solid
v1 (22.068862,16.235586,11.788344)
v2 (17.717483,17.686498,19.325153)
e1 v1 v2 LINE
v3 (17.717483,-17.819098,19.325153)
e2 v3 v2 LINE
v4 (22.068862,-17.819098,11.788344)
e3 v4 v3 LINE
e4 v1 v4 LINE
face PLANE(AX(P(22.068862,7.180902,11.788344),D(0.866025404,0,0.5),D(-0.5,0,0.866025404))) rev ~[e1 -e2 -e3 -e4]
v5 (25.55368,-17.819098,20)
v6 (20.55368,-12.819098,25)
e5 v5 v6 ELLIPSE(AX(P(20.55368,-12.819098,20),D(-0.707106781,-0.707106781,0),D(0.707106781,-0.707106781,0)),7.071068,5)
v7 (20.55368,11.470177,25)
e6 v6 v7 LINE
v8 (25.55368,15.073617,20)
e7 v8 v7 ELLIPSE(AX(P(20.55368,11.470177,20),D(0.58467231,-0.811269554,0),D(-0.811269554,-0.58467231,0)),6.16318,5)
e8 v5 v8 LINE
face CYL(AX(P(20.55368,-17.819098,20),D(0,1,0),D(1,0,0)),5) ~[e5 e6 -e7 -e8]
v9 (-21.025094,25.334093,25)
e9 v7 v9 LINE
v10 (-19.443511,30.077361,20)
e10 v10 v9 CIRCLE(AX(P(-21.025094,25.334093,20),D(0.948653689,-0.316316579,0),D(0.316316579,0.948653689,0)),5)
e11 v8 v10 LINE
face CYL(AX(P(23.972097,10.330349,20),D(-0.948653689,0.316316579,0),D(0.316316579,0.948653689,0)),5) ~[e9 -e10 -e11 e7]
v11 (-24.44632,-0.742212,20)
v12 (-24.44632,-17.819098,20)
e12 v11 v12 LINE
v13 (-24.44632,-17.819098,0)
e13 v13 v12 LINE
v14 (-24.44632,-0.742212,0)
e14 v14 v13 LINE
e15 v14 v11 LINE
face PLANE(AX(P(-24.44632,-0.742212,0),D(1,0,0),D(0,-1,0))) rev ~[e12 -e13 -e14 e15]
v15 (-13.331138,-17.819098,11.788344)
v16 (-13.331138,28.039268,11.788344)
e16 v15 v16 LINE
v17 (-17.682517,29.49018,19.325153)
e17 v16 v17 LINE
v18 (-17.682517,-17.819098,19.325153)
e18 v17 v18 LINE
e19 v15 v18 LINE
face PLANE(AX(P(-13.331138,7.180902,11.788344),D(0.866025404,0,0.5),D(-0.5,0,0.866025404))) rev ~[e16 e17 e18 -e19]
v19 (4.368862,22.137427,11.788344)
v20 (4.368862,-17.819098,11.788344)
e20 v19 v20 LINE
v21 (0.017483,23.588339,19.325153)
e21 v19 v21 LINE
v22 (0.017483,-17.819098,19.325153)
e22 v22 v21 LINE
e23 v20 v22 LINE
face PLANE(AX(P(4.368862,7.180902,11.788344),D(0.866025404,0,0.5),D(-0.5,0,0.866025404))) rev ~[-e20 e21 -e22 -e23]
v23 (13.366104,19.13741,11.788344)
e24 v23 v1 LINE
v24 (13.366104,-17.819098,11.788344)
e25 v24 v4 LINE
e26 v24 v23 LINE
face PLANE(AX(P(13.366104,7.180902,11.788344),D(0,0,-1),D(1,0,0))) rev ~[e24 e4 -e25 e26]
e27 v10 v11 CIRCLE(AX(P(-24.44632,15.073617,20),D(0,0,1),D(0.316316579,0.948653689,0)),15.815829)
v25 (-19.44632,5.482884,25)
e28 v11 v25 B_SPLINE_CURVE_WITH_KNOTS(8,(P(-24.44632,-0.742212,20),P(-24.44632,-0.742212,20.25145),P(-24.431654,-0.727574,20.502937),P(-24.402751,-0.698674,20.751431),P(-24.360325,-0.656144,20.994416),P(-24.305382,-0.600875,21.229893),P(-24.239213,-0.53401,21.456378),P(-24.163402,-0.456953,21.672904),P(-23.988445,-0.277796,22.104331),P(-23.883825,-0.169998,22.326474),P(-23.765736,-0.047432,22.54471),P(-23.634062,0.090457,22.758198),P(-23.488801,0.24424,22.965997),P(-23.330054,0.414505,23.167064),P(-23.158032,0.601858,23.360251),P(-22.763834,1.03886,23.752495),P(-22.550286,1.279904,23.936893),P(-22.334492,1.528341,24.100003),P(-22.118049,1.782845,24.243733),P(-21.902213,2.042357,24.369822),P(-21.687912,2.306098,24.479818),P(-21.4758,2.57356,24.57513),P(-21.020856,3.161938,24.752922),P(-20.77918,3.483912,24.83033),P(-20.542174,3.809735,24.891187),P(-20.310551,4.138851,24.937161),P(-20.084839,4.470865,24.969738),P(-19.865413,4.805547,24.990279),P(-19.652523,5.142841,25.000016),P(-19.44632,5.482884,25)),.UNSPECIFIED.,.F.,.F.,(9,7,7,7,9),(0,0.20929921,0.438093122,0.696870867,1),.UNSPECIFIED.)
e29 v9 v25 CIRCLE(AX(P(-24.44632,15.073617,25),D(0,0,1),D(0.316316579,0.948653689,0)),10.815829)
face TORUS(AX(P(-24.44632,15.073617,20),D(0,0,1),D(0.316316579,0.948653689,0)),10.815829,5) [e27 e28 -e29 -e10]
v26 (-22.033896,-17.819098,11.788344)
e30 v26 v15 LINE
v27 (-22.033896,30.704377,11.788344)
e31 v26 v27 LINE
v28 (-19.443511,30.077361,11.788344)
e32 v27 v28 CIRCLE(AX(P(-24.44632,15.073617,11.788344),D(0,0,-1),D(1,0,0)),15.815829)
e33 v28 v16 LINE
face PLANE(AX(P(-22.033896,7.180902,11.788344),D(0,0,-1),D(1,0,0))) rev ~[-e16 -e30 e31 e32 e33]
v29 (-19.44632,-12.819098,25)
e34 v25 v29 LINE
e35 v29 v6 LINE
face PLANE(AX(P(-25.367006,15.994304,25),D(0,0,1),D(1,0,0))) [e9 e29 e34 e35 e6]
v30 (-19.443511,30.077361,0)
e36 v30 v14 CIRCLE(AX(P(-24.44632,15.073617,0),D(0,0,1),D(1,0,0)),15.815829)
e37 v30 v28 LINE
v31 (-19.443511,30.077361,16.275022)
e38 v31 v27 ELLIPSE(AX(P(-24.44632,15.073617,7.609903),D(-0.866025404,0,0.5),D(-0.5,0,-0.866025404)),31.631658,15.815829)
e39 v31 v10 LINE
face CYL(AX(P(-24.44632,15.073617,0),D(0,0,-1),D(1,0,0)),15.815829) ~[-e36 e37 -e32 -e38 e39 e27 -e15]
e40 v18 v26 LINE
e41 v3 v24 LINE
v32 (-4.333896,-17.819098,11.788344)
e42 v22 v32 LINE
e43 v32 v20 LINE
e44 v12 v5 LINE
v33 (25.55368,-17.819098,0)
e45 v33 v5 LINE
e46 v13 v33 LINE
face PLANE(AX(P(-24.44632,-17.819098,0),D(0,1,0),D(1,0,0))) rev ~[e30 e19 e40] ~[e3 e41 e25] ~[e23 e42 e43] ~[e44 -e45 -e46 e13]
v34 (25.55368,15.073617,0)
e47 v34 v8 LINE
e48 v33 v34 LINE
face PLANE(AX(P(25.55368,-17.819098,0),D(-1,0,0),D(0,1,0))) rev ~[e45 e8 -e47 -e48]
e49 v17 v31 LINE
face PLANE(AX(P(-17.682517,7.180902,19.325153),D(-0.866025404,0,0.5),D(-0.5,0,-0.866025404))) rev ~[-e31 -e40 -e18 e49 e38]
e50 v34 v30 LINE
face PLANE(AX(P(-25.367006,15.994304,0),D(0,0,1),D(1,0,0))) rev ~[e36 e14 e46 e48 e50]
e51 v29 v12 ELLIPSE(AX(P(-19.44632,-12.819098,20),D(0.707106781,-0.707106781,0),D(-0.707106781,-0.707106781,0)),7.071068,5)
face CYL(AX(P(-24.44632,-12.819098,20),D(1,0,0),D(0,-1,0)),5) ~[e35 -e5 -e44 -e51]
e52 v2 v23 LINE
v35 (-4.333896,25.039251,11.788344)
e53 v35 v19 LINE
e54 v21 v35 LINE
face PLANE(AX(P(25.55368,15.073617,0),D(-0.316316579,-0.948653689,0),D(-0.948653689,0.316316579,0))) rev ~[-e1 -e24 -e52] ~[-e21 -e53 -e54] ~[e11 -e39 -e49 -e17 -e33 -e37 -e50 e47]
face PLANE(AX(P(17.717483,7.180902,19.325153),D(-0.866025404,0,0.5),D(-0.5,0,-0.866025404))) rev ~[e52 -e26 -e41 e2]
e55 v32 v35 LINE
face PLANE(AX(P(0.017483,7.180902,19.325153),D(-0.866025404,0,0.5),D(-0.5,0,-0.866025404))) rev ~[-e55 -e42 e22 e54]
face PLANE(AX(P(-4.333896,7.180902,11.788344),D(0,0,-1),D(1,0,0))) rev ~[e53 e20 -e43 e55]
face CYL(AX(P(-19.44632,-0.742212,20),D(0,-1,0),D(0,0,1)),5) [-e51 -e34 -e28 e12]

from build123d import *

# Parameters (mm, degrees)
F1_DEPTH = 25
F4_DEPTH = 25
F5_DEPTH = 23.7095438224
F6_R     = 5


# Not quite as in the source:
# - the program builds the solid bodies; features that only make, move or delete a surface that nothing else refers to are left out


with BuildPart() as f1:
    # F0 (on Top) → F1 (new body)
    with BuildSketch(Plane.XY):
        with BuildLine():
            ThreePointArc((-24.4463197887, 8.4633977604), (-29.1204506303, 19.7477478306), (-17.8361005601, 15.073616989))
            Line((-17.8361005601, 15.073616989), (-8.6304908186, 15.073616989))
            ThreePointArc((-8.6304908186, 15.073616989), (-11.6154192696, 24.3206942504), (-19.4435108685, 30.0773614855))
            ThreePointArc((-19.4435108685, 30.0773614855), (-40.0578075922, 17.607762717), (-24.4463197887, -0.7422119811))
            Line((-24.4463197887, -0.7422119811), (-24.4463197887, 8.4633977604))
        make_face()
        with BuildLine():
            Line((-17.8361005601, 15.073616989), (-24.4463197887, 15.073616989))
            Line((-24.4463197887, 15.073616989), (-24.4463197887, 8.4633977604))
            ThreePointArc((-24.4463197887, 8.4633977604), (-19.772188947, 10.3994861473), (-17.8361005601, 15.073616989))
        make_face()
        with BuildLine():
            Line((-24.4463197887, 8.4633977604), (-24.4463197887, 15.073616989))
            Line((-24.4463197887, 15.073616989), (-17.8361005601, 15.073616989))
            ThreePointArc((-17.8361005601, 15.073616989), (-29.1204506303, 19.7477478306), (-24.4463197887, 8.4633977604))
        make_face()
        with BuildLine():
            ThreePointArc((-19.4435108685, 30.0773614855), (-11.6154192696, 24.3206942504), (-8.6304908186, 15.073616989))
            Line((-8.6304908186, 15.073616989), (25.5536802113, 15.073616989))
            Line((25.5536802113, 15.073616989), (-19.4435108685, 30.0773614855))
        make_face()
        with BuildLine():
            Line((25.5536802113, 15.073616989), (-8.6304908186, 15.073616989))
            ThreePointArc((-8.6304908186, 15.073616989), (-13.2628398739, 3.8901370741), (-24.4463197887, -0.7422119811))
            Line((-24.4463197887, -0.7422119811), (-24.4463197887, -17.8190978634))
            Line((-24.4463197887, -17.8190978634), (25.5536802113, -17.8190978634))
            Line((25.5536802113, -17.8190978634), (25.5536802113, 15.073616989))
        make_face()
        with BuildLine():
            Line((-8.6304908186, 15.073616989), (-17.8361005601, 15.073616989))
            ThreePointArc((-17.8361005601, 15.073616989), (-19.772188947, 10.3994861473), (-24.4463197887, 8.4633977604))
            Line((-24.4463197887, 8.4633977604), (-24.4463197887, -0.7422119811))
            ThreePointArc((-24.4463197887, -0.7422119811), (-13.2628398739, 3.8901370741), (-8.6304908186, 15.073616989))
        make_face()
    extrude(amount=F1_DEPTH)

    # F3 (on face) → F4 (cut)
    with BuildSketch(Plane.XZ.offset(17.8190978634)):
        Polygon((-22.0338956294, 11.7883440107), (-13.3311382654, 11.7883440107), (-17.6825169474, 19.3251529709), align=None)
        Polygon((4.3688617346, 11.7883440107), (0.0174830526, 19.3251529709), (-4.3338956294, 11.7883440107), align=None)
        Polygon((22.0688617346, 11.7883440107), (17.7174830526, 19.3251529709), (13.3661043706, 11.7883440107), align=None)
    extrude(amount=-F4_DEPTH, mode=Mode.SUBTRACT)

    # F5 (cut, through all): faces of the model
    f5_faces = [f1.faces().sort_by_distance(p)[0] for p in [
        (-17.6825169474, 7.1809021366, 14.3006136641),
        (0.0174830526, 7.1809021366, 14.3006136641),
        (17.7174830526, 7.1809021366, 14.3006136641),
    ]]
    extrude(f5_faces, amount=-F5_DEPTH, mode=Mode.SUBTRACT)

    # F6
    f6_edges = [f1.edges().sort_by_distance(p)[0] for p in [
        (-40.057808, 17.607763, 25),
        (-24.44632, -9.280655, 25),
        (0.55368, -17.819098, 25),
        (25.55368, -1.37274, 25),
        (3.055085, 22.575489, 25),
    ]]
    fillet(f6_edges, radius=F6_R)


solid = f1.part
